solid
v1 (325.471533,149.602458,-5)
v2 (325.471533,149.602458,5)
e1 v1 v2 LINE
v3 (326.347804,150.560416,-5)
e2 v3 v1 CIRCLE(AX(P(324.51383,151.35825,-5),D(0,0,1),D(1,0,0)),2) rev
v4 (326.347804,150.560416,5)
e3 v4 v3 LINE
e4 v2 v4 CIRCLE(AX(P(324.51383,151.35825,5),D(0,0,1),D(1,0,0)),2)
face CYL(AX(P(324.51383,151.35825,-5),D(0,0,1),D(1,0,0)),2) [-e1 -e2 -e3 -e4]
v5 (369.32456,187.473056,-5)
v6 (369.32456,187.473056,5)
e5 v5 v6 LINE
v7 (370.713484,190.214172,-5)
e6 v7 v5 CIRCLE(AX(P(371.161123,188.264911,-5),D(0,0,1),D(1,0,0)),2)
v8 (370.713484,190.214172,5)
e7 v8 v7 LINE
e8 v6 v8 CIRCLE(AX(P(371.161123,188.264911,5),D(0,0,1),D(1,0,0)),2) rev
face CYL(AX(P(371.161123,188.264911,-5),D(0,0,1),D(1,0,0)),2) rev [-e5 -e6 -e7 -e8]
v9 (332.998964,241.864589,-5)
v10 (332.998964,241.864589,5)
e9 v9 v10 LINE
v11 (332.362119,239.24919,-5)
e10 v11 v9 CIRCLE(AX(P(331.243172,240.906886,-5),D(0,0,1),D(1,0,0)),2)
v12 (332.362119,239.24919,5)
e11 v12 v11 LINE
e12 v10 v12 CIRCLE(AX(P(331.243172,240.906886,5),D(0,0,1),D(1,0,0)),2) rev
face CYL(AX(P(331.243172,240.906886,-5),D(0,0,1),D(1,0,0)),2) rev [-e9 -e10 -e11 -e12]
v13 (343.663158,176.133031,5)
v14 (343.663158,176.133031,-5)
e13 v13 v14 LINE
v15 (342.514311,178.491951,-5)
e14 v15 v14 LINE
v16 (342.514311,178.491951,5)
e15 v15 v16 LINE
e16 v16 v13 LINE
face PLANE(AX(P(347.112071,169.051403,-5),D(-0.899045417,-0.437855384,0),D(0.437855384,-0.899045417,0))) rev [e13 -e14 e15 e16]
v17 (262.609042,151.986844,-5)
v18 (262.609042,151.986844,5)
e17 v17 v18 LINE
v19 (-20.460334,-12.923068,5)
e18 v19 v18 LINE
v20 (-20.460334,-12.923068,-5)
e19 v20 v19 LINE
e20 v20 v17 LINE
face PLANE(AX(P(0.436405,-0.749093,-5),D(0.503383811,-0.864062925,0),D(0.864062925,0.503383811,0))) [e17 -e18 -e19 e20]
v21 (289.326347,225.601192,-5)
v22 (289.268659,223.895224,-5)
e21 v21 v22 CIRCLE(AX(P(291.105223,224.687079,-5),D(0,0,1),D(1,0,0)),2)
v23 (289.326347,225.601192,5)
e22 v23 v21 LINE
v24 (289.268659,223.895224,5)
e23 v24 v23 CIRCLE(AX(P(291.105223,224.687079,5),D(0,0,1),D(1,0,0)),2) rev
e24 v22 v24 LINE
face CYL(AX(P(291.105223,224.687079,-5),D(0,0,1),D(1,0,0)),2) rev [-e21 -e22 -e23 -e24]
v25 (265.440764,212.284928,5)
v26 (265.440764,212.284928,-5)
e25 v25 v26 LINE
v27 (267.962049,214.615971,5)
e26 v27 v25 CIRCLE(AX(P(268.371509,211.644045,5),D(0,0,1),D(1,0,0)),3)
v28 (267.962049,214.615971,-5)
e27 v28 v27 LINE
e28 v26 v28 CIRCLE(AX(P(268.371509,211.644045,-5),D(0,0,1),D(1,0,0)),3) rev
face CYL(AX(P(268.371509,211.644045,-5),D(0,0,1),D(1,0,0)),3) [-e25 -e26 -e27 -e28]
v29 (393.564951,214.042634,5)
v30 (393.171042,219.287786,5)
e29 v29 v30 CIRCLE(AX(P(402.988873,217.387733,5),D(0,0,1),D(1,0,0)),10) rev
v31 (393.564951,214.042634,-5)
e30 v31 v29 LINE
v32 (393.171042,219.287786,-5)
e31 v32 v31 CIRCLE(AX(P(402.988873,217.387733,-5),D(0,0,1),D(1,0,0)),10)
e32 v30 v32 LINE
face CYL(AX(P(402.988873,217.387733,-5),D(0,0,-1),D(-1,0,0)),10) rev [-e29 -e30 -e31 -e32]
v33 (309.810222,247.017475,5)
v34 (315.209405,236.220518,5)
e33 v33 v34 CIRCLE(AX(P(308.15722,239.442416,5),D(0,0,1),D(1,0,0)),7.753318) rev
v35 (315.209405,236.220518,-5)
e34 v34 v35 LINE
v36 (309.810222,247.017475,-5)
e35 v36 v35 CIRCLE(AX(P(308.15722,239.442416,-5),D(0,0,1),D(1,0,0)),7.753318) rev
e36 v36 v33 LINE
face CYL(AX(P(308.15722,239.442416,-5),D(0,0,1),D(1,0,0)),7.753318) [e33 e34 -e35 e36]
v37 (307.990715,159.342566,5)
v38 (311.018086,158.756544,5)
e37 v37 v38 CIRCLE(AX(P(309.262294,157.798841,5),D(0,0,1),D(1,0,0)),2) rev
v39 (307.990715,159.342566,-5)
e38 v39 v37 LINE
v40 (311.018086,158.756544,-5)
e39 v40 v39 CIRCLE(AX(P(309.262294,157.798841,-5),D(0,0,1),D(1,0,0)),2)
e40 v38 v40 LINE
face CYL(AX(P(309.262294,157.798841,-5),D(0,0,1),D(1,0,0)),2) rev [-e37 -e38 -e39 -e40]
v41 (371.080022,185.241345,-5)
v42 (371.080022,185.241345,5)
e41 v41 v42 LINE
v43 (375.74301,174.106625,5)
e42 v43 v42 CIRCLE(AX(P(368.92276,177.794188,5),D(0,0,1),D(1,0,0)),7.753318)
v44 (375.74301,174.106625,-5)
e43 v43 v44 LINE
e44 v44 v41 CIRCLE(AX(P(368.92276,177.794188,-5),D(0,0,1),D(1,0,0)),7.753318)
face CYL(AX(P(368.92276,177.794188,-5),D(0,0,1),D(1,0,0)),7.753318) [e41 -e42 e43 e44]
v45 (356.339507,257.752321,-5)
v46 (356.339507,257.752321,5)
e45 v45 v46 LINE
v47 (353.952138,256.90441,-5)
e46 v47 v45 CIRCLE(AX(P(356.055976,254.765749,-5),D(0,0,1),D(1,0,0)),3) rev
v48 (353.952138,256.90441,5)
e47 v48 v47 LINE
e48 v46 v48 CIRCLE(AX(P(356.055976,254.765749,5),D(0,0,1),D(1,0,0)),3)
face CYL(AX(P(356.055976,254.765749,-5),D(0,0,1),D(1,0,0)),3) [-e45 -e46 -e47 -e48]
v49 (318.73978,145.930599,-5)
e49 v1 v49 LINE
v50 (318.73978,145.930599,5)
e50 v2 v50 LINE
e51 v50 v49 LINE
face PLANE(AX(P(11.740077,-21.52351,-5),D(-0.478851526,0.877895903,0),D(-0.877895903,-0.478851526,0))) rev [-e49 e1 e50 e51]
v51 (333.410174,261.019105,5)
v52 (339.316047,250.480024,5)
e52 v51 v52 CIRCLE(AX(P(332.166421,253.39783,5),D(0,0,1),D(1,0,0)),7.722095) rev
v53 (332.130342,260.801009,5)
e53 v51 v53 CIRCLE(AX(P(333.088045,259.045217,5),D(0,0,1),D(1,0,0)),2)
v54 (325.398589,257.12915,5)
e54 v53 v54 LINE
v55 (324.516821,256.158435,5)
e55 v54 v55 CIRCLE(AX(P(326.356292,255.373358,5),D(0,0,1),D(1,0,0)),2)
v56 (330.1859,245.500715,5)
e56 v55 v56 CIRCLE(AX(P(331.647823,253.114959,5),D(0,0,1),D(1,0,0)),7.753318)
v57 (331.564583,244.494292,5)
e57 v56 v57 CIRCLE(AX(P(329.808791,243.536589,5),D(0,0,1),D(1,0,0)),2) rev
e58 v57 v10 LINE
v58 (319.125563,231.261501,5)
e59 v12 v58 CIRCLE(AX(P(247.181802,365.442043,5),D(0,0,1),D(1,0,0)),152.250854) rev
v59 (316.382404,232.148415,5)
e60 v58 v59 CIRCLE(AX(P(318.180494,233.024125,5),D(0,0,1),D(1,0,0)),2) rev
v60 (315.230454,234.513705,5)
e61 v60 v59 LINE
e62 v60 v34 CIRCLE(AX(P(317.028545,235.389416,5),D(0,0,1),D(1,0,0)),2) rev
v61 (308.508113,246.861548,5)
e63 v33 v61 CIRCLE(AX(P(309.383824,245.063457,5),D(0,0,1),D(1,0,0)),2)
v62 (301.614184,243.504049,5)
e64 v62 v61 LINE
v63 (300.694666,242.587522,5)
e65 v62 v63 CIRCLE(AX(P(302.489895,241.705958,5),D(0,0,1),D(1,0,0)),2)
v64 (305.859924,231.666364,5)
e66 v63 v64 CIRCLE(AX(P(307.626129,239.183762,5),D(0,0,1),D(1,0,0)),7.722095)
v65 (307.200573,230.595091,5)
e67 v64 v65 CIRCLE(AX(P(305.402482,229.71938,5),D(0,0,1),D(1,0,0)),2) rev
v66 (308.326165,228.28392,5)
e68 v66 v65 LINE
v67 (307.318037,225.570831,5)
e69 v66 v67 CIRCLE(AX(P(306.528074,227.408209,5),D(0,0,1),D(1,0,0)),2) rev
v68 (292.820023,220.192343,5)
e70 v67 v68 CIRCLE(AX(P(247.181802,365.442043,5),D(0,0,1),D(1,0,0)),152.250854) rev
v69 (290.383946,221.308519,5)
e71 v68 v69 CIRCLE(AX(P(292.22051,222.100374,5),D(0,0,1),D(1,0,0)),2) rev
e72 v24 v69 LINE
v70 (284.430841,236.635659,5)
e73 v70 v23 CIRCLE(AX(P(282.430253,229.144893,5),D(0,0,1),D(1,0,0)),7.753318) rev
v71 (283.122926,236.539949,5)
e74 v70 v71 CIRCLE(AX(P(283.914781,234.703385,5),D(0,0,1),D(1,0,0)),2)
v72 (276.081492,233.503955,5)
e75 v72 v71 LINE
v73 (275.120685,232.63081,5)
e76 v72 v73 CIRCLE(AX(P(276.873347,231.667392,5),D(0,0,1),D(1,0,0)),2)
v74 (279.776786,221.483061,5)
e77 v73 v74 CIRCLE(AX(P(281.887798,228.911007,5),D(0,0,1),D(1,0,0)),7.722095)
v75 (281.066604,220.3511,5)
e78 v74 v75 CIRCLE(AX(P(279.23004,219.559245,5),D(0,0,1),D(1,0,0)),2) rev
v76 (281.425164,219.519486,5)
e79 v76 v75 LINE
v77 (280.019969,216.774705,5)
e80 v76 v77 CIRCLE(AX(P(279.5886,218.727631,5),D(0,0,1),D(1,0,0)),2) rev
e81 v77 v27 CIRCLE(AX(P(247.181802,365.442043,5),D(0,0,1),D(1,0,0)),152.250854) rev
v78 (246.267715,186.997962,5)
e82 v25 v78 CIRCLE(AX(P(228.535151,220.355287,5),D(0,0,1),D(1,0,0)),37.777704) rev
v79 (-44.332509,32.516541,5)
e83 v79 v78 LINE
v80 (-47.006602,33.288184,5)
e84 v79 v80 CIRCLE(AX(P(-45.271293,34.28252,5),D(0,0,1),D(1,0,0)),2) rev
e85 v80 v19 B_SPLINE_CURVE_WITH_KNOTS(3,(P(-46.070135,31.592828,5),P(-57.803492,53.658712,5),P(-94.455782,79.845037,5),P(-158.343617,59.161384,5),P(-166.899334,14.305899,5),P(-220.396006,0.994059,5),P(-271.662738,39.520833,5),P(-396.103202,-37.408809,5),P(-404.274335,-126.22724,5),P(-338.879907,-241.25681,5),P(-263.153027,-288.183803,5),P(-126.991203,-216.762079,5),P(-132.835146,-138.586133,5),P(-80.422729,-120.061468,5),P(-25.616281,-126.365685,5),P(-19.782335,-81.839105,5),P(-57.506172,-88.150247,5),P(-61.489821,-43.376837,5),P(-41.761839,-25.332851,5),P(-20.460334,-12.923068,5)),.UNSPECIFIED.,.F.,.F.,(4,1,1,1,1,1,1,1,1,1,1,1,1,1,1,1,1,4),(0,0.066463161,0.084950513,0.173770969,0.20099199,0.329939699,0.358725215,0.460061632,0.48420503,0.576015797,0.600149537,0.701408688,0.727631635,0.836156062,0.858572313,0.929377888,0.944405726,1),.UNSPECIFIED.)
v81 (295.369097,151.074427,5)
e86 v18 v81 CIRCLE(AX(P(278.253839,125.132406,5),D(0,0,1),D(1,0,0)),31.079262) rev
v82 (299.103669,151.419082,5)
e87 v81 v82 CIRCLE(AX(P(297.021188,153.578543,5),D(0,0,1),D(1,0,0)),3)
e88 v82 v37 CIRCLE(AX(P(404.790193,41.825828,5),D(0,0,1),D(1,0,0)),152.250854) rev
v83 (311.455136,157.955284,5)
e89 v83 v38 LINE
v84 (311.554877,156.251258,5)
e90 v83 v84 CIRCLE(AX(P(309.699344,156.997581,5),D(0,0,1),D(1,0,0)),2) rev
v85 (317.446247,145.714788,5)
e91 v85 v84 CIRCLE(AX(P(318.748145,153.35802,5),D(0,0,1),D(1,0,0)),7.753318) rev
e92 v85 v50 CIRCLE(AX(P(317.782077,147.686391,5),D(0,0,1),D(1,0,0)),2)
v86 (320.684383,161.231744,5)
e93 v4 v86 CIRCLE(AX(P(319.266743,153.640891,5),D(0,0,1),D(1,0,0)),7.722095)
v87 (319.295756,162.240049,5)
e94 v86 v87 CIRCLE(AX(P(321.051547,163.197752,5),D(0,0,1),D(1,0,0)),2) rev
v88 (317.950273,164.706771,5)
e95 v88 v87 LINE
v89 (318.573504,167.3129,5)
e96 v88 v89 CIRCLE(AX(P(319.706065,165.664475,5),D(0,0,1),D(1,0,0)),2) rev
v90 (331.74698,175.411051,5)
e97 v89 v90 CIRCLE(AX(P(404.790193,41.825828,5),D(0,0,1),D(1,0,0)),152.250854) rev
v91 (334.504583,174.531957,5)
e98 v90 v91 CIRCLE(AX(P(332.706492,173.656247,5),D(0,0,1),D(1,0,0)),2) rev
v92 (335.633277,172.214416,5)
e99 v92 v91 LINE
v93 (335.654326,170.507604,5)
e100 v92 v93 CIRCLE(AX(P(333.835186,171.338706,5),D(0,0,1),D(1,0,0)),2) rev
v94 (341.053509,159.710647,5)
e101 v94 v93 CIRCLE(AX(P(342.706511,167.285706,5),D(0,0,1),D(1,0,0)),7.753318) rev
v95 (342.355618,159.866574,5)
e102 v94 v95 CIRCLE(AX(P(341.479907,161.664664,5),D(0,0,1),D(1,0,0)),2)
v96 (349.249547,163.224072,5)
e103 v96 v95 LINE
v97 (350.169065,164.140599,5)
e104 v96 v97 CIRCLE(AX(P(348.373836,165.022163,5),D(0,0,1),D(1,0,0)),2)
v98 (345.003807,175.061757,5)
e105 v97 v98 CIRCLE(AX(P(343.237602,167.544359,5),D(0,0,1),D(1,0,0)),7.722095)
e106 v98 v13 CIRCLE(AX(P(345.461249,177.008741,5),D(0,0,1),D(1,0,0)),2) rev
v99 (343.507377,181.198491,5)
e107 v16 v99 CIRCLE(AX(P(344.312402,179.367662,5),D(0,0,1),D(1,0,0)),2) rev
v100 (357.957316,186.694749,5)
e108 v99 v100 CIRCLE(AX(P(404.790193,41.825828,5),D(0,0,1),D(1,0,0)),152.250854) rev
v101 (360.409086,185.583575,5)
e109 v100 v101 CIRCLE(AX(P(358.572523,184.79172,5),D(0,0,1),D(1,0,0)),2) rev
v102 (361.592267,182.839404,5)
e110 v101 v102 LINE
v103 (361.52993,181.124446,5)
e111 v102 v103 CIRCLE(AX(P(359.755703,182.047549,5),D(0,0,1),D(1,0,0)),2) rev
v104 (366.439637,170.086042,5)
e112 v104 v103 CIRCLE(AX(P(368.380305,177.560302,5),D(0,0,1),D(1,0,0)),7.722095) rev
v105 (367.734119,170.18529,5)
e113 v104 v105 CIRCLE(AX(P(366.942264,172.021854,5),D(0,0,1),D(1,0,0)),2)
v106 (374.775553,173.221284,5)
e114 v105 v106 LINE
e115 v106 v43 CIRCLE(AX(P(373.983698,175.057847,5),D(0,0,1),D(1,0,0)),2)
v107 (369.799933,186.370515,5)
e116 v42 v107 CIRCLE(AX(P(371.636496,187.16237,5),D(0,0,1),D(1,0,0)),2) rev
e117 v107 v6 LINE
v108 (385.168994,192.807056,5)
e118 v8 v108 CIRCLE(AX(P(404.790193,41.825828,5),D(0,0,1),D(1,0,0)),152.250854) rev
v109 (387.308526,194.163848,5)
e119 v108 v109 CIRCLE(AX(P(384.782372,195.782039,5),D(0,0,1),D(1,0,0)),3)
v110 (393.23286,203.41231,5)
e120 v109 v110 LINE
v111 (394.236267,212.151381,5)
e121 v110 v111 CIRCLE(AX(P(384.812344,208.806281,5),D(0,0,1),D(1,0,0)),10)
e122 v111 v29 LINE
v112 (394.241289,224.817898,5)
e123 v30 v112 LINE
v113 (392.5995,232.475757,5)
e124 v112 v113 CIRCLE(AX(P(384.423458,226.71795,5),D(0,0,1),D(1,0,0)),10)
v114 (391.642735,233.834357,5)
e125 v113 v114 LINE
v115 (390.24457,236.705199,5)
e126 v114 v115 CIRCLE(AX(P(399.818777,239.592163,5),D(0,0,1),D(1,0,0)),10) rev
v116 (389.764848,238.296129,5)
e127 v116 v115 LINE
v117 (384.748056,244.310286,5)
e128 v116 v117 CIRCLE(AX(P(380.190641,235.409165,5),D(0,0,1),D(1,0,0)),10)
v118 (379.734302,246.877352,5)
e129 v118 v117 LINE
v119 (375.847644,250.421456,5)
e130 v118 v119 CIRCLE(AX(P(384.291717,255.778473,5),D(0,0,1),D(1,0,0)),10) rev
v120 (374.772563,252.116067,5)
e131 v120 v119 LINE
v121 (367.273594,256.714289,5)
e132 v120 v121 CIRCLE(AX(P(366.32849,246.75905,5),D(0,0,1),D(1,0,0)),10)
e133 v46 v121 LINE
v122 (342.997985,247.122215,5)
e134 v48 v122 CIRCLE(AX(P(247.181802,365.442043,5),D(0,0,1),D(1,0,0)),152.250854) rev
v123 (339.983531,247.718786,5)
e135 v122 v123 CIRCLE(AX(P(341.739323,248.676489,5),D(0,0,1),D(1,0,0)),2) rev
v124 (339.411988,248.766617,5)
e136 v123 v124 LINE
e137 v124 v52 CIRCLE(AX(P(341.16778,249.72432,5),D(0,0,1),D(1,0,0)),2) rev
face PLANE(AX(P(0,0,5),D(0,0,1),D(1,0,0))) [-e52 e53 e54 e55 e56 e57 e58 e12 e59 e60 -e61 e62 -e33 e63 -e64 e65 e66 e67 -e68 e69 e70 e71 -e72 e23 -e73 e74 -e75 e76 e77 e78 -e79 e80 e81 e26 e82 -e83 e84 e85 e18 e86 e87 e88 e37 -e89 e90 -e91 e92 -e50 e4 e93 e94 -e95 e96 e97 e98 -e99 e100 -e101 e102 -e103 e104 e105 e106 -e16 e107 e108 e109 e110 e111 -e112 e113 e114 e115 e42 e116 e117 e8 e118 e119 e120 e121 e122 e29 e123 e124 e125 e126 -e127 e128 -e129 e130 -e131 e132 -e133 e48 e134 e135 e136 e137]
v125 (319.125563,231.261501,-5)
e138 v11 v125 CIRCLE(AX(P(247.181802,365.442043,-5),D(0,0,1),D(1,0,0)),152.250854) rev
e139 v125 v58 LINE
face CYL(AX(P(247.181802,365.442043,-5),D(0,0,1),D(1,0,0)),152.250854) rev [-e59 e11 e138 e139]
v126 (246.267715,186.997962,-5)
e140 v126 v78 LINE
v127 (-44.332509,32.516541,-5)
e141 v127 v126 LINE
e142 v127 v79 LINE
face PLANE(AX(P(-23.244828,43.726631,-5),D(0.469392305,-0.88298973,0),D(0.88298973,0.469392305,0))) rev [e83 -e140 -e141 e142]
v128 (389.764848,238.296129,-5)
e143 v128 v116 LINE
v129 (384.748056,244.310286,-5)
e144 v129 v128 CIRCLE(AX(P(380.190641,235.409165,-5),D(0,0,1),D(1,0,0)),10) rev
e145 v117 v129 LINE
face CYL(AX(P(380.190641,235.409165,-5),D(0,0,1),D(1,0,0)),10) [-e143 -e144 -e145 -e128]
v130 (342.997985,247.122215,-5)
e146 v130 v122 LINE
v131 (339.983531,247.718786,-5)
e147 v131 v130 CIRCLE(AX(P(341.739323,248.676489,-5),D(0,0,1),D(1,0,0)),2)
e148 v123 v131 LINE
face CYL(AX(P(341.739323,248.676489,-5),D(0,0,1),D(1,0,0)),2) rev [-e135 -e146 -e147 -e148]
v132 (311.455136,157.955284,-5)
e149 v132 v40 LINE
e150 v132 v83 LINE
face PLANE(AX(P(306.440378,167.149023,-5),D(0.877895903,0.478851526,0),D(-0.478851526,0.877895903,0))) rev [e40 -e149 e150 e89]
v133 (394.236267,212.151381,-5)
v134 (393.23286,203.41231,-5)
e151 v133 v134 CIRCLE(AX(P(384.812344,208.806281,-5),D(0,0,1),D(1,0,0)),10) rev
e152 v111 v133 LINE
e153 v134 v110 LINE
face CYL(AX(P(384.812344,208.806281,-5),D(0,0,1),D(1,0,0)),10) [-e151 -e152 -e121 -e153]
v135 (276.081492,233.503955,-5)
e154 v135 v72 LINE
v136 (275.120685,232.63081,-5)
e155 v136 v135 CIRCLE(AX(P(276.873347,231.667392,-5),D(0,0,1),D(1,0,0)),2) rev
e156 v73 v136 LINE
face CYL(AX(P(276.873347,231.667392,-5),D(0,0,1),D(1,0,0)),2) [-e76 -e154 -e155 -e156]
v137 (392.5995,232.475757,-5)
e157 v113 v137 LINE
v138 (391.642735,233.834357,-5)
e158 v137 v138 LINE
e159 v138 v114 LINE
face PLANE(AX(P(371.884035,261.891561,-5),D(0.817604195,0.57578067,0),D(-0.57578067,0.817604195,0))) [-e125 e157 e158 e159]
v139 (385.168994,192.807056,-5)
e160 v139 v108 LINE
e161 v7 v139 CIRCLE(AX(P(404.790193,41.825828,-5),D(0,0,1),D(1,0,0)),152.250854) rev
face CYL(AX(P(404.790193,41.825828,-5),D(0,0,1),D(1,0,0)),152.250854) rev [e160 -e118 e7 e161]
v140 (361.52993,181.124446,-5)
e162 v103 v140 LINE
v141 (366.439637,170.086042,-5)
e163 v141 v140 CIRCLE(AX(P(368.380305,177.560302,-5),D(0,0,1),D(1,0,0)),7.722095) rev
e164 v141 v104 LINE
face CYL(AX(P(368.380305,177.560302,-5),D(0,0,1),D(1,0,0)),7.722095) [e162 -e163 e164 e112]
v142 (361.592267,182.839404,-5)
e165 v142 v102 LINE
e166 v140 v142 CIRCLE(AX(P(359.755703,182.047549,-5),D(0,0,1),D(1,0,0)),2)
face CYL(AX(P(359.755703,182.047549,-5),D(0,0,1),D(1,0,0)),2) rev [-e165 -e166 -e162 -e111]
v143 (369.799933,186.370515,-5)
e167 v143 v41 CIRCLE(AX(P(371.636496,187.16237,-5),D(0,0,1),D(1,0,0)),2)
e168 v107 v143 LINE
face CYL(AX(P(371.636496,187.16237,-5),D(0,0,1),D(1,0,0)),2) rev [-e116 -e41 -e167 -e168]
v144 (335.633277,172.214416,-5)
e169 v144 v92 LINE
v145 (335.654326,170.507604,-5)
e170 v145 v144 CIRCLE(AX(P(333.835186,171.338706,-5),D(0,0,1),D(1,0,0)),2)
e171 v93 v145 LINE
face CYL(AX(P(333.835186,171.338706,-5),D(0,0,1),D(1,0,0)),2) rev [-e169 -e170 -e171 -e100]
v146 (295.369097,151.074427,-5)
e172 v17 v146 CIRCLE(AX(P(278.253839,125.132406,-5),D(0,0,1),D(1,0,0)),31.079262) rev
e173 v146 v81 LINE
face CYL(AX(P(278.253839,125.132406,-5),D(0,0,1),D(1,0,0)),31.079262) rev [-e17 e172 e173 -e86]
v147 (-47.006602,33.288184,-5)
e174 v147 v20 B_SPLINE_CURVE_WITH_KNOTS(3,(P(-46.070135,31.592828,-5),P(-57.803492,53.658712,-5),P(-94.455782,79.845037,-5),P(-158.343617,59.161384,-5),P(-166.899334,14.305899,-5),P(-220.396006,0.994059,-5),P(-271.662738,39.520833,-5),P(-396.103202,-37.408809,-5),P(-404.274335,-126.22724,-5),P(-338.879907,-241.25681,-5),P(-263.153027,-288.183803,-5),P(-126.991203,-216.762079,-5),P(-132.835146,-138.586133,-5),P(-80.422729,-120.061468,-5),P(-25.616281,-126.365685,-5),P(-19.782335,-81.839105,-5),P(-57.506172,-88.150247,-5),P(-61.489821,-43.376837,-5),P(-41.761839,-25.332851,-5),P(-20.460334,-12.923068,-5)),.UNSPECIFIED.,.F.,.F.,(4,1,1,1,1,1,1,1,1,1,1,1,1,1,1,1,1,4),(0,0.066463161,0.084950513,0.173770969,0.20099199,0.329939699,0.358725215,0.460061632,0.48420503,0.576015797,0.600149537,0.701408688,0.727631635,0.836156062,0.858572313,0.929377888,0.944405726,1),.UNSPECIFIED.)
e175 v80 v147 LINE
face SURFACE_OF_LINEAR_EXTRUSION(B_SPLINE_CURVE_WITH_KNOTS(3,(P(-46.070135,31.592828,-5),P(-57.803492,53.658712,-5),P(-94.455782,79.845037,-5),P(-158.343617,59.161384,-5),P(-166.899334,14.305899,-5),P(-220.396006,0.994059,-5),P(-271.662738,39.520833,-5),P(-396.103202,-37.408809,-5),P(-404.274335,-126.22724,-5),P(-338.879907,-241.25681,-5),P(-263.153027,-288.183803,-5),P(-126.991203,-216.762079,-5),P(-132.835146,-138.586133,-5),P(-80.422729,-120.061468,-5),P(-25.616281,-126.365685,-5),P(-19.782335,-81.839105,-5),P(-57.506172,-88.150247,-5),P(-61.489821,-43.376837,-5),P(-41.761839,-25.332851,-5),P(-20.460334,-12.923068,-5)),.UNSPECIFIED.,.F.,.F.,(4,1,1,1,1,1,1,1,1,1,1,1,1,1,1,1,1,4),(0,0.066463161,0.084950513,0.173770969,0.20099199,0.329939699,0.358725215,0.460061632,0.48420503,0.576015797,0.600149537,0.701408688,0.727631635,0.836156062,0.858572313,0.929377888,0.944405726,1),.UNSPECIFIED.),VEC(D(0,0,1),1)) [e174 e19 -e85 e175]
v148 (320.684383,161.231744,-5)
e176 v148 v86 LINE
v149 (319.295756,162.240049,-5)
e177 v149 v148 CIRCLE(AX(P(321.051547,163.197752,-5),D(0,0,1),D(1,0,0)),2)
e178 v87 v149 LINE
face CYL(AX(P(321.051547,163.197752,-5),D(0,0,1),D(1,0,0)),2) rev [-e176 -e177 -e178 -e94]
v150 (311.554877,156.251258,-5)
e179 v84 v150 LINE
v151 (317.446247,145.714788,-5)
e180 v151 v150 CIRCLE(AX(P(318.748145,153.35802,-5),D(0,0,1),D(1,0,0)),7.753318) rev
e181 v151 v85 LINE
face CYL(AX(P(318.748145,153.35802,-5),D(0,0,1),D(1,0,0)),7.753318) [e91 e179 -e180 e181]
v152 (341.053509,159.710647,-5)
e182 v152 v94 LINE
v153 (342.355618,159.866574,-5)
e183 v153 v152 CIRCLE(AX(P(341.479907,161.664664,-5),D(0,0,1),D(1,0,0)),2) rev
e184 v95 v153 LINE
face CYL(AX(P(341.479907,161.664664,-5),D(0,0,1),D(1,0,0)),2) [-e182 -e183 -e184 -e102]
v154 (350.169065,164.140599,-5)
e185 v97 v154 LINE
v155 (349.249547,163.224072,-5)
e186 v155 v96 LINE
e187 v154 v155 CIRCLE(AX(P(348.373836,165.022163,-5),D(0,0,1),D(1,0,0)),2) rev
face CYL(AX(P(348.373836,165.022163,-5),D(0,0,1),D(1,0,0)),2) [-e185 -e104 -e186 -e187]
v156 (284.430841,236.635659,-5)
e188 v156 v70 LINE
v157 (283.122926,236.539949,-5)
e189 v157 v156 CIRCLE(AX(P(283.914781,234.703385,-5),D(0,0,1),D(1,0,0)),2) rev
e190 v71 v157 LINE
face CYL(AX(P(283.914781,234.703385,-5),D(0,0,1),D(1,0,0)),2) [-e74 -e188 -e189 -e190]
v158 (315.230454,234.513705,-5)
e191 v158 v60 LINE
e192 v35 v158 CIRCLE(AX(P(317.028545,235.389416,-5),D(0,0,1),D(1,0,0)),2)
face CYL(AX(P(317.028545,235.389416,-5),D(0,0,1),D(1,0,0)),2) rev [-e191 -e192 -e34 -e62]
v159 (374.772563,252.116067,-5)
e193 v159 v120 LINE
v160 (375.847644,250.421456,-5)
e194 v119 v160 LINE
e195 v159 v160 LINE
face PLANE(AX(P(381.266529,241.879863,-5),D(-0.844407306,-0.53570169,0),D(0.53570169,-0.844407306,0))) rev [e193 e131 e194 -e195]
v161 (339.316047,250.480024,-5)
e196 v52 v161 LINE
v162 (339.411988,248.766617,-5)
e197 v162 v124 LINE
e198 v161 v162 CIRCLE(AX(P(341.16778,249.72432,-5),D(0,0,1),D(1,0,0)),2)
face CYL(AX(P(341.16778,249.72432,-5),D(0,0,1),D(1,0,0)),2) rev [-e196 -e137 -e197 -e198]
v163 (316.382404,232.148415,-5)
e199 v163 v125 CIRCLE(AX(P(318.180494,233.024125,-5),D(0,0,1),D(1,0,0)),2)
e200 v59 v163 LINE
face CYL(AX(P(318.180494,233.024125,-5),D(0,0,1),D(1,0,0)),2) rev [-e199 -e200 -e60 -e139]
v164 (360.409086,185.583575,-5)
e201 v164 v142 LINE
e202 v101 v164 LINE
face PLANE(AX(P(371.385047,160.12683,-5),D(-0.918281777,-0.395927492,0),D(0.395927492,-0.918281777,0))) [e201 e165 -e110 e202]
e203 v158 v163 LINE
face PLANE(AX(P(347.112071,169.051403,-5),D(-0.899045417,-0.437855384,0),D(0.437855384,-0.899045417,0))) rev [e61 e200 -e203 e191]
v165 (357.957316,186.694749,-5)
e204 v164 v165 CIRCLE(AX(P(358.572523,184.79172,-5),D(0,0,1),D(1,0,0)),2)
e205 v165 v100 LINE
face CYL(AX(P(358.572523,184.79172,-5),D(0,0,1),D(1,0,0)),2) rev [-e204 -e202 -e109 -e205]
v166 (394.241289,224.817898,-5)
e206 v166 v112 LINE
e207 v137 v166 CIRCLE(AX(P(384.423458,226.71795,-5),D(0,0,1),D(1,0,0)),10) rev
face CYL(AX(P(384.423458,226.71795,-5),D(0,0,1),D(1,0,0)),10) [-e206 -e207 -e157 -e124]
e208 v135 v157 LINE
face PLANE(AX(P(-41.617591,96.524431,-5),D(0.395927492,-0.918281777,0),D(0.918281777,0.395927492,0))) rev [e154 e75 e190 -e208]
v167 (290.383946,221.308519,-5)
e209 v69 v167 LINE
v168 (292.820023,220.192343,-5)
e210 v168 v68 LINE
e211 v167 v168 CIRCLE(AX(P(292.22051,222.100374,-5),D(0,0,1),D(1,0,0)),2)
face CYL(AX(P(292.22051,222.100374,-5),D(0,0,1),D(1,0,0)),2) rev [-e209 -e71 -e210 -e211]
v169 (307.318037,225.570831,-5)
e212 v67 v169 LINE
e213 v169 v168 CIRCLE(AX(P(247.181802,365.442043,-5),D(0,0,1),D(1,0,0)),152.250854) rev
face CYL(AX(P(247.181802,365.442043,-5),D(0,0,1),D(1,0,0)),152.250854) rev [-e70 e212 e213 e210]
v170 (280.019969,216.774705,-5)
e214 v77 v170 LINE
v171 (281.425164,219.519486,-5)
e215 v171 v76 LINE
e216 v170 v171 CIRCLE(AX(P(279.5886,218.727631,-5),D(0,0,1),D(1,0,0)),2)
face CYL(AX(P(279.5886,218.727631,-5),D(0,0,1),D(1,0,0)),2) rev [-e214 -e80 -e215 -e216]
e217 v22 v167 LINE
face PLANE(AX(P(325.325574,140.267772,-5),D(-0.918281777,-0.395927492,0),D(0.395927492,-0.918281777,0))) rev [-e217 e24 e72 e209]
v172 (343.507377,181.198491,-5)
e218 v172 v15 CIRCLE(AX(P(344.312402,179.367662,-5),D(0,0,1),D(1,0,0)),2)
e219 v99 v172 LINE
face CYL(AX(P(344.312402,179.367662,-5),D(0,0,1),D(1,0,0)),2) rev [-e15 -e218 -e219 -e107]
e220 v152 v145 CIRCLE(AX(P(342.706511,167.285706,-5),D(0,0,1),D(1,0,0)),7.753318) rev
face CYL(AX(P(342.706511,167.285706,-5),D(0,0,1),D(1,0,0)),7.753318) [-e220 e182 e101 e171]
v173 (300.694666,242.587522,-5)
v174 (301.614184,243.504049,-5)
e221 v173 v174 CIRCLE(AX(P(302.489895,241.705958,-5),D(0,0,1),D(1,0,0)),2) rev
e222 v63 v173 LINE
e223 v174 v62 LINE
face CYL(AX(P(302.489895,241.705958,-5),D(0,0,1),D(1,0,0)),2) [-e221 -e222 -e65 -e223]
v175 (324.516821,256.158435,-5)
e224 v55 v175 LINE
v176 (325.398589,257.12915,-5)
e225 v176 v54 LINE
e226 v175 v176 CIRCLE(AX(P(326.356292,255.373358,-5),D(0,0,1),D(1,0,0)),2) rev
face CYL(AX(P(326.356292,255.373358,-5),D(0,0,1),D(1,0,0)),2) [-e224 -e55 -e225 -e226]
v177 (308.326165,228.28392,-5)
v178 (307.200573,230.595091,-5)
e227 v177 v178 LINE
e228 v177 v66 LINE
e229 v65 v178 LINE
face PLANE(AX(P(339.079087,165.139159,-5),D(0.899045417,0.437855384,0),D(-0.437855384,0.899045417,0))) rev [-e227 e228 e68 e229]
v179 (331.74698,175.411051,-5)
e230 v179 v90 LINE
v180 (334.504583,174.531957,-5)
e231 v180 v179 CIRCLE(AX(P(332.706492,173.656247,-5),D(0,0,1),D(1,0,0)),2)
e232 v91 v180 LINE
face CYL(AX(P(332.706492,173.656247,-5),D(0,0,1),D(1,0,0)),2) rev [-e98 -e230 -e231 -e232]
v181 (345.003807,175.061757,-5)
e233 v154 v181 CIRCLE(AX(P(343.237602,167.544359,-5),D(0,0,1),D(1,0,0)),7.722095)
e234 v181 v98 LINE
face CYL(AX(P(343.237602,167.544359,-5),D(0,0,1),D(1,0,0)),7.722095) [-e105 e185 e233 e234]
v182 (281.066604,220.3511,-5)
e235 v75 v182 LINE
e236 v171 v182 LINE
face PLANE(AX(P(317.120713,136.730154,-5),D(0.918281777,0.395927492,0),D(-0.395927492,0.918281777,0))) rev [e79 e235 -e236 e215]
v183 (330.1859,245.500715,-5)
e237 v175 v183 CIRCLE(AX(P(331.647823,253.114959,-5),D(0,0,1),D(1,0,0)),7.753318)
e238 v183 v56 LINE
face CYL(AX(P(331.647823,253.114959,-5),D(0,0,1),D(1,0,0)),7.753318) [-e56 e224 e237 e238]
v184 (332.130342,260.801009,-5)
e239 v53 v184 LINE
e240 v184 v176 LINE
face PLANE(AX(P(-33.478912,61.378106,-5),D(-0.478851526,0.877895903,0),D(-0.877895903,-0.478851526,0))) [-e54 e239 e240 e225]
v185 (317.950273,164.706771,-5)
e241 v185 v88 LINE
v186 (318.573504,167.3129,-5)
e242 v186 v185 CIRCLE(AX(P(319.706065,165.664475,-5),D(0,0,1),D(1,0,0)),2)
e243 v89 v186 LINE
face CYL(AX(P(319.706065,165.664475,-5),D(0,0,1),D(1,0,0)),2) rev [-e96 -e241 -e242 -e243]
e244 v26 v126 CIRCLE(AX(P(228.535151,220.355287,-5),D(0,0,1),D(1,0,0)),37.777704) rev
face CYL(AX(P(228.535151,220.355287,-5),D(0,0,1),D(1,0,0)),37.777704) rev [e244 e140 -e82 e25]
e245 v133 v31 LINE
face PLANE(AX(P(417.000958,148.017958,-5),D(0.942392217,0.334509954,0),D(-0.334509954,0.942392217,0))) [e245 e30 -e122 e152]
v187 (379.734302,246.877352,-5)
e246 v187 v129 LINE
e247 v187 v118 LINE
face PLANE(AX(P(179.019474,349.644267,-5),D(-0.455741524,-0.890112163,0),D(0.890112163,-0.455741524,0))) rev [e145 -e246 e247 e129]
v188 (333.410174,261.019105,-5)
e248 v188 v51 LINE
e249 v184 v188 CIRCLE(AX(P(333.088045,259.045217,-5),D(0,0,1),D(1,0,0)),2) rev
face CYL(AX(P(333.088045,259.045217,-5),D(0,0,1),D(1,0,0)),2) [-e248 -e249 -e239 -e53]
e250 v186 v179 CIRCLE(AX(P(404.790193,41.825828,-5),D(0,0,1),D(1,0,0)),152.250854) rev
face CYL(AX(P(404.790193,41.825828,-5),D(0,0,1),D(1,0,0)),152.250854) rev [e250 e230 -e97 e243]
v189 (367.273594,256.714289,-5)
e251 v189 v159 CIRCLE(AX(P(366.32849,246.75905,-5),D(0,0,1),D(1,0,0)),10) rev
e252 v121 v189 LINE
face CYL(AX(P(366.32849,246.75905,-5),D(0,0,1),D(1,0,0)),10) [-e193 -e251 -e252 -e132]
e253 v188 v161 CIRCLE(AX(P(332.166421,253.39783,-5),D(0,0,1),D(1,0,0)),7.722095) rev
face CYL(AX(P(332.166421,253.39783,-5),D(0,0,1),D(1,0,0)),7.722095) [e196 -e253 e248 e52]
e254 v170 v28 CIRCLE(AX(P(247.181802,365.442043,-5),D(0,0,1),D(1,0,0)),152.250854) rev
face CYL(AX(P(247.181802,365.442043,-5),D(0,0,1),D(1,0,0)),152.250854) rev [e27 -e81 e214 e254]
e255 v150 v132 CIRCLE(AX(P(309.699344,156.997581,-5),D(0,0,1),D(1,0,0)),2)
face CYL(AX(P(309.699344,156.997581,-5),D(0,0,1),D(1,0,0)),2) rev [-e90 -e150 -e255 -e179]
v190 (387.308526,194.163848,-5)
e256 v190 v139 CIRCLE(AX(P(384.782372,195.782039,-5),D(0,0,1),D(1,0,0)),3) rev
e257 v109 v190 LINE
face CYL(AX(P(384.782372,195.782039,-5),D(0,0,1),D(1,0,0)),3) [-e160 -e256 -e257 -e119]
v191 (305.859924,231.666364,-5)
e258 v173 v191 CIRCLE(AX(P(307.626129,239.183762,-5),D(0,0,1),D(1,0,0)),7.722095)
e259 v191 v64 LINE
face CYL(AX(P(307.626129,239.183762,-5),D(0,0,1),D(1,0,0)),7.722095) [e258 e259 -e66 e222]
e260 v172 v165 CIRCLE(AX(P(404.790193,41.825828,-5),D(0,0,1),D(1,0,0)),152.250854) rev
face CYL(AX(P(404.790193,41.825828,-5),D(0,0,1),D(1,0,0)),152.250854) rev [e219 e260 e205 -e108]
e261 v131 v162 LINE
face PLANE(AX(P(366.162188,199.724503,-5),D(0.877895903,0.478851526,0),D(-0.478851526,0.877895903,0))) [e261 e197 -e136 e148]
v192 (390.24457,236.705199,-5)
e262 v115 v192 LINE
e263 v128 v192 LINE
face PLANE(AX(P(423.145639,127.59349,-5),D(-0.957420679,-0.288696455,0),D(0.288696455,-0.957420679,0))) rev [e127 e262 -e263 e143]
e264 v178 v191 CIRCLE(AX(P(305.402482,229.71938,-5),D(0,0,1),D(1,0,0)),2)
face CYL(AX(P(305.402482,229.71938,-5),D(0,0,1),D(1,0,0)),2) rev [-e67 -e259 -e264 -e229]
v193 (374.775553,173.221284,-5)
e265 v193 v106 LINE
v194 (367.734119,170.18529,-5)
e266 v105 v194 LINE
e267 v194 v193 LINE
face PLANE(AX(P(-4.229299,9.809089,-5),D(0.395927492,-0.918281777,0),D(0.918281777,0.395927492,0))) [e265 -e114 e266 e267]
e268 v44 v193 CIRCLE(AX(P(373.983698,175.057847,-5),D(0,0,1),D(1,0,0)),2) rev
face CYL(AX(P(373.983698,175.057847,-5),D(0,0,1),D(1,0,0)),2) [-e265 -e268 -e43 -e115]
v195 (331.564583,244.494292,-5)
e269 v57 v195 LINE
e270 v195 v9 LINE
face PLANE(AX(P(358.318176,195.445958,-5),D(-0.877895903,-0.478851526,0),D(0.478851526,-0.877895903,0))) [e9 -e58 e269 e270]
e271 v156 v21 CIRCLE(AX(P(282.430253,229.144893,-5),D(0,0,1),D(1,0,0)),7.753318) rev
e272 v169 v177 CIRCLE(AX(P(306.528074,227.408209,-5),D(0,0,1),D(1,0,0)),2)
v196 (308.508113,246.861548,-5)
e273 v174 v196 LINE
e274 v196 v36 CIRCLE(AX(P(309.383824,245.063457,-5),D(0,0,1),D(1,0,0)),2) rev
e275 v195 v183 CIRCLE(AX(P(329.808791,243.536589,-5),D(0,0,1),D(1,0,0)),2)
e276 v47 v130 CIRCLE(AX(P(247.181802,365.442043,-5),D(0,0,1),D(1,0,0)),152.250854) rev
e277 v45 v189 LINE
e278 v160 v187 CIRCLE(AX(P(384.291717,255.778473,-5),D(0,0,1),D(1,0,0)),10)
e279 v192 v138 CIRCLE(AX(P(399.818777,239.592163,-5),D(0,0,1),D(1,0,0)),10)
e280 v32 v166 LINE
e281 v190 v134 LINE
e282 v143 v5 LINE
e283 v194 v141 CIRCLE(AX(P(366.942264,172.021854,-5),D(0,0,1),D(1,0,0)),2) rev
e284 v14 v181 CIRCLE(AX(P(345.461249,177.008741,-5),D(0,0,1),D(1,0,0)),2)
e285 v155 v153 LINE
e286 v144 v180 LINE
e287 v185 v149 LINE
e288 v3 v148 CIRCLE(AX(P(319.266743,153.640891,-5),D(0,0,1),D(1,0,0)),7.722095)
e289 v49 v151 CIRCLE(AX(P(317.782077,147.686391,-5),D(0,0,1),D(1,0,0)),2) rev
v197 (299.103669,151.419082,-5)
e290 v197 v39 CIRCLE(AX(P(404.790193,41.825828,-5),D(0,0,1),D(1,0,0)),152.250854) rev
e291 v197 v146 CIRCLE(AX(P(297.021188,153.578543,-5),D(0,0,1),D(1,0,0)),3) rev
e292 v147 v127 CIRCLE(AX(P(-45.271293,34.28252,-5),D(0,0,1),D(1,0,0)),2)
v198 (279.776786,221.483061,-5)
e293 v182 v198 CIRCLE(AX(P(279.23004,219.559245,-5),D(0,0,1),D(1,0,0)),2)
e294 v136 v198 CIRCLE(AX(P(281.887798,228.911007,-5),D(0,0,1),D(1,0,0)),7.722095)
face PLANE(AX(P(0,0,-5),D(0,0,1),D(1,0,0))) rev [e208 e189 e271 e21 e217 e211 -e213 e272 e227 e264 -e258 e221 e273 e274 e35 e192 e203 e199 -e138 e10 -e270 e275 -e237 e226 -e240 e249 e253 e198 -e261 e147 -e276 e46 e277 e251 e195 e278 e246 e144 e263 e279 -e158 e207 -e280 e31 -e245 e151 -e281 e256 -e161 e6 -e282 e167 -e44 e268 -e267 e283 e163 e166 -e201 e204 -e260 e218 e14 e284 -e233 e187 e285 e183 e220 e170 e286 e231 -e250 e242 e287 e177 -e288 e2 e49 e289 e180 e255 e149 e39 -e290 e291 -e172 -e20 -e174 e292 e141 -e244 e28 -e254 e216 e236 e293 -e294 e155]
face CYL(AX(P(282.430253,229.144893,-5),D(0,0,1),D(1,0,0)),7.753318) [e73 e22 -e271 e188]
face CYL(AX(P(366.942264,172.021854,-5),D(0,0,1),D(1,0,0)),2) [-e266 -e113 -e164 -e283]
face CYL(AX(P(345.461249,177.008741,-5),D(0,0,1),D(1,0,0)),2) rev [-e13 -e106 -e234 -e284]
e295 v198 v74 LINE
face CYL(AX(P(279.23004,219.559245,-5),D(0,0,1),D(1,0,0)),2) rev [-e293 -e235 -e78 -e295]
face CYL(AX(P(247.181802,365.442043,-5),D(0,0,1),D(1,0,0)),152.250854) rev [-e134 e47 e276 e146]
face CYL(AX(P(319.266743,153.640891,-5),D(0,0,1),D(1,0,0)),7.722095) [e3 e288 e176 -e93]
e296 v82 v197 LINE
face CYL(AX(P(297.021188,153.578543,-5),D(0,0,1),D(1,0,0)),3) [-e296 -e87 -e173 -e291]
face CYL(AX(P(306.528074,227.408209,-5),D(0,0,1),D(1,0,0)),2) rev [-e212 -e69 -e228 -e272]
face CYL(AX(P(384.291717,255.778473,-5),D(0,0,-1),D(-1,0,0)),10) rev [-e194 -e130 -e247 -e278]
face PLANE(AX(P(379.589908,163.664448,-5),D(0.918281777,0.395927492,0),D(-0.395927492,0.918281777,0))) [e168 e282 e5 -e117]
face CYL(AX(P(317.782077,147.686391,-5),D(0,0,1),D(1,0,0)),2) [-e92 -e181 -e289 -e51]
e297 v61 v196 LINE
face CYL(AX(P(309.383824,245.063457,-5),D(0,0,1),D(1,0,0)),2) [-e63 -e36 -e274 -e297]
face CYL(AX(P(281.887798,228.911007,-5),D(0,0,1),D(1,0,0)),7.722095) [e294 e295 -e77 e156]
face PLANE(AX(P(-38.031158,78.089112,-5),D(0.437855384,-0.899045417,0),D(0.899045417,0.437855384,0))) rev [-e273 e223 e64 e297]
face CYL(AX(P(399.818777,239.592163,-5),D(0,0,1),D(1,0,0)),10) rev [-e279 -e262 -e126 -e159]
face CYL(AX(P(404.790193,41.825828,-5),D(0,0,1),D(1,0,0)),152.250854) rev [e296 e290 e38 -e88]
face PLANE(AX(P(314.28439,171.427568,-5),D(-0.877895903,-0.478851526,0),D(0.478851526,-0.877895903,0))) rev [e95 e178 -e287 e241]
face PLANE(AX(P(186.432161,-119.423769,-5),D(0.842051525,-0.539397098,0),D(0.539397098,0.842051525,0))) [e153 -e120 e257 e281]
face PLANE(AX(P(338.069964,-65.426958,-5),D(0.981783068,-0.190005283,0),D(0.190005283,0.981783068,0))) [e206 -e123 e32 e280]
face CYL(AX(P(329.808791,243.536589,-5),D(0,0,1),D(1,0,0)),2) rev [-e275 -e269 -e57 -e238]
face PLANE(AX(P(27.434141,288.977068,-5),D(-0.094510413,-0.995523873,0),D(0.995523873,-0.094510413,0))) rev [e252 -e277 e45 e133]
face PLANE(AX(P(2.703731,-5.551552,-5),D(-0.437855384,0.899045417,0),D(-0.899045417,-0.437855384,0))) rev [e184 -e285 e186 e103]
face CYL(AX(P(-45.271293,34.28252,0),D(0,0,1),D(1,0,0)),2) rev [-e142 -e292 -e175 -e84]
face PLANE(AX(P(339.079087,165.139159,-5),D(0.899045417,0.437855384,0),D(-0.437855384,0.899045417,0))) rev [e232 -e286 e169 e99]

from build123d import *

# Parameters (mm, degrees)
SKIZZE2_W                           = 841
SKIZZE2_H                           = 594
AUFSATZ_LINEAR_AUSTRAGEN1_DEPTH     = 5
SCHNITT_LINEAR_START                = -10
SCHNITT_LINEAR_AUSTRAGEN1_OUTLINE_W = 841
SCHNITT_LINEAR_AUSTRAGEN1_OUTLINE_H = 594
SCHNITT_LINEAR_AUSTRAGEN1_DEPTH     = 10
VERRUNDUNG1_R                       = 2
VERRUNDUNG2_R                       = 3
VERRUNDUNG3_R                       = 10
VERRUNDUNG4_R                       = 2


# Read off the part's stored shape, not the designer's step: Schnitt-Linear austragen1
with BuildPart() as part:
    # Skizze2 → Aufsatz-Linear austragen1 (new, symmetric)
    with BuildSketch(Plane.XY):
        Rectangle(SKIZZE2_W, SKIZZE2_H)
    extrude(amount=AUFSATZ_LINEAR_AUSTRAGEN1_DEPTH, both=True)

    # Schnitt-Linear austragen1 outline → Schnitt-Linear austragen1 (cut)
    with BuildSketch(Plane.XY.offset(5).offset(SCHNITT_LINEAR_START)):
        Rectangle(SCHNITT_LINEAR_AUSTRAGEN1_OUTLINE_W, SCHNITT_LINEAR_AUSTRAGEN1_OUTLINE_H)
        with BuildLine():
            add(Edge.make_bspline(
                [(-46.070134676, 31.592828452), (-57.803492393, 53.658712352), (-94.455782402, 79.845036722), (-158.34361712, 59.161383964), (-166.899333837, 14.30589872), (-220.39600599, 0.994058676), (-271.66273811, 39.520833327), (-396.103201952, -37.408808839), (-404.274335311, -126.227240483), (-338.879906572, -241.256809884), (-263.153026558, -288.183802576), (-126.991203132, -216.762078957), (-132.835145955, -138.586133123), (-80.422728506, -120.061467648), (-25.616281184, -126.365685224), (-19.782335113, -81.839104844), (-57.506172353, -88.150246671), (-61.489821321, -43.376836902), (-41.761839371, -25.332850566), (-20.460334335, -12.923068286)],
                knots=[0, 0, 0, 0, 0.066463161, 0.084950513, 0.173770969, 0.20099199, 0.329939699, 0.358725215, 0.460061632, 0.48420503, 0.576015797, 0.600149537, 0.701408688, 0.727631635, 0.836156062, 0.858572313, 0.929377888, 0.944405726, 1, 1, 1, 1], degree=3))
            Line((-46.070134676, 31.592828452), (246.267714639, 186.997962048))
            ThreePointArc((246.267714639, 186.997962048), (259.257809032, 198.37181085), (265.830492974, 214.337612261))
            ThreePointArc((265.830492974, 214.337612261), (274.144256626, 215.597628014), (282.375777438, 217.3147101))
            Line((282.375777438, 217.3147101), (280.663242022, 221.286624391))
            ThreePointArc((280.663242022, 221.286624391), (274.796738789, 225.853617671), (275.503121702, 233.254584566))
            Line((275.503121702, 233.254584566), (283.707982283, 236.792202271))
            ThreePointArc((283.707982283, 236.792202271), (289.549983069, 232.214644487), (288.868102604, 224.824242097))
            Line((288.868102604, 224.824242097), (291.09416587, 219.661293395))
            ThreePointArc((291.09416587, 219.661293395), (300.273415324, 222.74795326), (309.237859535, 226.411944206))
            Line((309.237859535, 226.411944206), (306.754495799, 231.511017708))
            ThreePointArc((306.754495799, 231.511017708), (300.683614697, 235.802601384), (301.047929545, 243.228270546))
            Line((301.047929545, 243.228270546), (309.080912988, 247.140514557))
            ThreePointArc((309.080912988, 247.140514557), (315.127804925, 242.837247616), (314.787479242, 235.423261719))
            Line((314.787479242, 235.423261719), (317.286687835, 230.291654081))
            ThreePointArc((317.286687835, 230.291654081), (325.73467707, 235.020539958), (333.86503352, 240.276792211))
            Line((333.86503352, 240.276792211), (331.080132618, 245.382452228))
            ThreePointArc((331.080132618, 245.382452228), (324.84121723, 249.402271033), (324.839263922, 256.824063582))
            Line((324.839263922, 256.824063582), (332.683276153, 261.102608699))
            ThreePointArc((332.683276153, 261.102608699), (338.945616376, 257.095567055), (338.924144849, 249.660997345))
            Line((338.924144849, 249.660997345), (341.123621653, 245.628616598))
            ThreePointArc((341.123621653, 245.628616598), (348.217868014, 251.54719683), (354.940064816, 257.885177073))
            Line((354.940064816, 257.885177073), (372.149037232, 256.251437163))
            Line((372.149037232, 256.251437163), (377.307925109, 248.119667755))
            Line((377.307925109, 248.119667755), (388.536209149, 242.370734654))
            Line((388.536209149, 242.370734654), (390.711494239, 235.156711451))
            Line((390.711494239, 235.156711451), (395.049916421, 228.996184773))
            Line((395.049916421, 228.996184773), (392.653102424, 216.6115218))
            Line((392.653102424, 216.6115218), (395.874483614, 207.536142962))
            Line((395.874483614, 207.536142962), (386.550277499, 192.980147014))
            ThreePointArc((386.550277499, 192.980147014), (377.415688409, 191.595515095), (368.381901663, 189.659379658))
            Line((368.381901663, 189.659379658), (370.200489027, 185.441497168))
            ThreePointArc((370.200489027, 185.441497168), (376.042489812, 180.863939383), (375.360609347, 173.473536993))
            Line((375.360609347, 173.473536993), (367.155748766, 169.935919288))
            ThreePointArc((367.155748766, 169.935919288), (361.289245532, 174.502912567), (361.995628445, 181.903879462))
            Line((361.995628445, 181.903879462), (359.692996483, 187.244415324))
            ThreePointArc((359.692996483, 187.244415324), (350.541833487, 184.084178059), (341.610026657, 180.348711489))
            Line((341.610026657, 180.348711489), (344.10923525, 175.217103851))
            ThreePointArc((344.10923525, 175.217103851), (350.180116352, 170.925520174), (349.815801504, 163.499851013))
            Line((349.815801504, 163.499851013), (341.782818061, 159.587607002))
            ThreePointArc((341.782818061, 159.587607002), (335.735926124, 163.890873943), (336.076251807, 171.30485984))
            Line((336.076251807, 171.30485984), (333.592888071, 176.403933343))
            ThreePointArc((333.592888071, 176.403933343), (325.181048786, 171.605282542), (317.091302963, 166.281552441))
            Line((317.091302963, 166.281552441), (319.783598431, 161.345669331))
            ThreePointArc((319.783598431, 161.345669331), (326.045938653, 157.338627687), (326.024467127, 149.904057977))
            Line((326.024467127, 149.904057977), (318.180454896, 145.62551286))
            ThreePointArc((318.180454896, 145.62551286), (311.941539508, 149.645331666), (311.9395862, 157.067124214))
            Line((311.9395862, 157.067124214), (309.868373127, 160.864354402))
            ThreePointArc((309.868373127, 160.864354402), (303.441237649, 155.442340449), (297.323244126, 149.673765147))
            ThreePointArc((297.323244126, 149.673765147), (280.320132437, 156.142903528), (262.609041888, 151.986844085))
            Line((262.609041888, 151.986844085), (-20.460334335, -12.923068286))
        make_face(mode=Mode.SUBTRACT)
    extrude(amount=SCHNITT_LINEAR_AUSTRAGEN1_DEPTH, mode=Mode.SUBTRACT)

    # Verrundung1
    verrundung1_edges = [part.edges().sort_by_distance(p)[0] for p in [
        (309.237859535, 226.411944206, 0),
        (306.754495799, 231.511017708, 0),
        (301.047929545, 243.228270546, 0),
        (309.080912988, 247.140514557, 0),
        (314.787479242, 235.423261719, 0),
        (317.286687835, 230.291654081, 0),
        (333.86503352, 240.276792211, 0),
        (331.080132618, 245.382452228, 0),
        (324.839263922, 256.824063582, 0),
        (332.683276153, 261.102608699, 0),
        (338.924144849, 249.660997345, 0),
        (341.123621653, 245.628616598, 0),
        (368.381901663, 189.659379658, 0),
        (370.200489027, 185.441497168, 0),
        (375.360609347, 173.473536993, 0),
        (367.155748766, 169.935919288, 0),
        (361.995628445, 181.903879462, 0),
        (359.692996483, 187.244415324, 0),
        (341.610026657, 180.348711489, 0),
        (344.10923525, 175.217103851, 0),
        (349.815801504, 163.499851013, 0),
        (341.782818061, 159.587607002, 0),
        (336.076251807, 171.30485984, 0),
        (333.592888071, 176.403933343, 0),
        (317.091302963, 166.281552441, 0),
        (319.783598431, 161.345669331, 0),
        (326.024467127, 149.904057977, 0),
        (318.180454896, 145.62551286, 0),
        (311.9395862, 157.067124214, 0),
        (309.868373127, 160.864354402, 0),
        (282.375777438, 217.3147101, 0),
        (280.663242022, 221.286624391, 0),
        (275.503121702, 233.254584566, 0),
        (283.707982283, 236.792202271, 0),
        (288.868102604, 224.824242097, 0),
        (291.09416587, 219.661293395, 0),
    ]]
    fillet(verrundung1_edges, radius=VERRUNDUNG1_R)

    # Verrundung2
    verrundung2_edges = [part.edges().sort_by_distance(p)[0] for p in [
        (354.940064816, 257.885177073, 0),
        (386.550277499, 192.980147014, 0),
        (297.323244126, 149.673765147, 0),
        (265.830492974, 214.337612261, 0),
    ]]
    fillet(verrundung2_edges, radius=VERRUNDUNG2_R)

    # Verrundung3
    verrundung3_edges = [part.edges().sort_by_distance(p)[0] for p in [
        (372.149037232, 256.251437163, 0),
        (377.307925109, 248.119667755, 0),
        (388.536209149, 242.370734654, 0),
        (390.711494239, 235.156711451, 0),
        (395.049916421, 228.996184773, 0),
        (392.653102424, 216.6115218, 0),
        (395.874483614, 207.536142962, 0),
    ]]
    fillet(verrundung3_edges, radius=VERRUNDUNG3_R)

    # Verrundung4
    verrundung4_edges = [part.edges().sort_by_distance(p)[0] for p in [
        (-46.070134676, 31.592828452, 0),
    ]]
    fillet(verrundung4_edges, radius=VERRUNDUNG4_R)


solid = part.part
